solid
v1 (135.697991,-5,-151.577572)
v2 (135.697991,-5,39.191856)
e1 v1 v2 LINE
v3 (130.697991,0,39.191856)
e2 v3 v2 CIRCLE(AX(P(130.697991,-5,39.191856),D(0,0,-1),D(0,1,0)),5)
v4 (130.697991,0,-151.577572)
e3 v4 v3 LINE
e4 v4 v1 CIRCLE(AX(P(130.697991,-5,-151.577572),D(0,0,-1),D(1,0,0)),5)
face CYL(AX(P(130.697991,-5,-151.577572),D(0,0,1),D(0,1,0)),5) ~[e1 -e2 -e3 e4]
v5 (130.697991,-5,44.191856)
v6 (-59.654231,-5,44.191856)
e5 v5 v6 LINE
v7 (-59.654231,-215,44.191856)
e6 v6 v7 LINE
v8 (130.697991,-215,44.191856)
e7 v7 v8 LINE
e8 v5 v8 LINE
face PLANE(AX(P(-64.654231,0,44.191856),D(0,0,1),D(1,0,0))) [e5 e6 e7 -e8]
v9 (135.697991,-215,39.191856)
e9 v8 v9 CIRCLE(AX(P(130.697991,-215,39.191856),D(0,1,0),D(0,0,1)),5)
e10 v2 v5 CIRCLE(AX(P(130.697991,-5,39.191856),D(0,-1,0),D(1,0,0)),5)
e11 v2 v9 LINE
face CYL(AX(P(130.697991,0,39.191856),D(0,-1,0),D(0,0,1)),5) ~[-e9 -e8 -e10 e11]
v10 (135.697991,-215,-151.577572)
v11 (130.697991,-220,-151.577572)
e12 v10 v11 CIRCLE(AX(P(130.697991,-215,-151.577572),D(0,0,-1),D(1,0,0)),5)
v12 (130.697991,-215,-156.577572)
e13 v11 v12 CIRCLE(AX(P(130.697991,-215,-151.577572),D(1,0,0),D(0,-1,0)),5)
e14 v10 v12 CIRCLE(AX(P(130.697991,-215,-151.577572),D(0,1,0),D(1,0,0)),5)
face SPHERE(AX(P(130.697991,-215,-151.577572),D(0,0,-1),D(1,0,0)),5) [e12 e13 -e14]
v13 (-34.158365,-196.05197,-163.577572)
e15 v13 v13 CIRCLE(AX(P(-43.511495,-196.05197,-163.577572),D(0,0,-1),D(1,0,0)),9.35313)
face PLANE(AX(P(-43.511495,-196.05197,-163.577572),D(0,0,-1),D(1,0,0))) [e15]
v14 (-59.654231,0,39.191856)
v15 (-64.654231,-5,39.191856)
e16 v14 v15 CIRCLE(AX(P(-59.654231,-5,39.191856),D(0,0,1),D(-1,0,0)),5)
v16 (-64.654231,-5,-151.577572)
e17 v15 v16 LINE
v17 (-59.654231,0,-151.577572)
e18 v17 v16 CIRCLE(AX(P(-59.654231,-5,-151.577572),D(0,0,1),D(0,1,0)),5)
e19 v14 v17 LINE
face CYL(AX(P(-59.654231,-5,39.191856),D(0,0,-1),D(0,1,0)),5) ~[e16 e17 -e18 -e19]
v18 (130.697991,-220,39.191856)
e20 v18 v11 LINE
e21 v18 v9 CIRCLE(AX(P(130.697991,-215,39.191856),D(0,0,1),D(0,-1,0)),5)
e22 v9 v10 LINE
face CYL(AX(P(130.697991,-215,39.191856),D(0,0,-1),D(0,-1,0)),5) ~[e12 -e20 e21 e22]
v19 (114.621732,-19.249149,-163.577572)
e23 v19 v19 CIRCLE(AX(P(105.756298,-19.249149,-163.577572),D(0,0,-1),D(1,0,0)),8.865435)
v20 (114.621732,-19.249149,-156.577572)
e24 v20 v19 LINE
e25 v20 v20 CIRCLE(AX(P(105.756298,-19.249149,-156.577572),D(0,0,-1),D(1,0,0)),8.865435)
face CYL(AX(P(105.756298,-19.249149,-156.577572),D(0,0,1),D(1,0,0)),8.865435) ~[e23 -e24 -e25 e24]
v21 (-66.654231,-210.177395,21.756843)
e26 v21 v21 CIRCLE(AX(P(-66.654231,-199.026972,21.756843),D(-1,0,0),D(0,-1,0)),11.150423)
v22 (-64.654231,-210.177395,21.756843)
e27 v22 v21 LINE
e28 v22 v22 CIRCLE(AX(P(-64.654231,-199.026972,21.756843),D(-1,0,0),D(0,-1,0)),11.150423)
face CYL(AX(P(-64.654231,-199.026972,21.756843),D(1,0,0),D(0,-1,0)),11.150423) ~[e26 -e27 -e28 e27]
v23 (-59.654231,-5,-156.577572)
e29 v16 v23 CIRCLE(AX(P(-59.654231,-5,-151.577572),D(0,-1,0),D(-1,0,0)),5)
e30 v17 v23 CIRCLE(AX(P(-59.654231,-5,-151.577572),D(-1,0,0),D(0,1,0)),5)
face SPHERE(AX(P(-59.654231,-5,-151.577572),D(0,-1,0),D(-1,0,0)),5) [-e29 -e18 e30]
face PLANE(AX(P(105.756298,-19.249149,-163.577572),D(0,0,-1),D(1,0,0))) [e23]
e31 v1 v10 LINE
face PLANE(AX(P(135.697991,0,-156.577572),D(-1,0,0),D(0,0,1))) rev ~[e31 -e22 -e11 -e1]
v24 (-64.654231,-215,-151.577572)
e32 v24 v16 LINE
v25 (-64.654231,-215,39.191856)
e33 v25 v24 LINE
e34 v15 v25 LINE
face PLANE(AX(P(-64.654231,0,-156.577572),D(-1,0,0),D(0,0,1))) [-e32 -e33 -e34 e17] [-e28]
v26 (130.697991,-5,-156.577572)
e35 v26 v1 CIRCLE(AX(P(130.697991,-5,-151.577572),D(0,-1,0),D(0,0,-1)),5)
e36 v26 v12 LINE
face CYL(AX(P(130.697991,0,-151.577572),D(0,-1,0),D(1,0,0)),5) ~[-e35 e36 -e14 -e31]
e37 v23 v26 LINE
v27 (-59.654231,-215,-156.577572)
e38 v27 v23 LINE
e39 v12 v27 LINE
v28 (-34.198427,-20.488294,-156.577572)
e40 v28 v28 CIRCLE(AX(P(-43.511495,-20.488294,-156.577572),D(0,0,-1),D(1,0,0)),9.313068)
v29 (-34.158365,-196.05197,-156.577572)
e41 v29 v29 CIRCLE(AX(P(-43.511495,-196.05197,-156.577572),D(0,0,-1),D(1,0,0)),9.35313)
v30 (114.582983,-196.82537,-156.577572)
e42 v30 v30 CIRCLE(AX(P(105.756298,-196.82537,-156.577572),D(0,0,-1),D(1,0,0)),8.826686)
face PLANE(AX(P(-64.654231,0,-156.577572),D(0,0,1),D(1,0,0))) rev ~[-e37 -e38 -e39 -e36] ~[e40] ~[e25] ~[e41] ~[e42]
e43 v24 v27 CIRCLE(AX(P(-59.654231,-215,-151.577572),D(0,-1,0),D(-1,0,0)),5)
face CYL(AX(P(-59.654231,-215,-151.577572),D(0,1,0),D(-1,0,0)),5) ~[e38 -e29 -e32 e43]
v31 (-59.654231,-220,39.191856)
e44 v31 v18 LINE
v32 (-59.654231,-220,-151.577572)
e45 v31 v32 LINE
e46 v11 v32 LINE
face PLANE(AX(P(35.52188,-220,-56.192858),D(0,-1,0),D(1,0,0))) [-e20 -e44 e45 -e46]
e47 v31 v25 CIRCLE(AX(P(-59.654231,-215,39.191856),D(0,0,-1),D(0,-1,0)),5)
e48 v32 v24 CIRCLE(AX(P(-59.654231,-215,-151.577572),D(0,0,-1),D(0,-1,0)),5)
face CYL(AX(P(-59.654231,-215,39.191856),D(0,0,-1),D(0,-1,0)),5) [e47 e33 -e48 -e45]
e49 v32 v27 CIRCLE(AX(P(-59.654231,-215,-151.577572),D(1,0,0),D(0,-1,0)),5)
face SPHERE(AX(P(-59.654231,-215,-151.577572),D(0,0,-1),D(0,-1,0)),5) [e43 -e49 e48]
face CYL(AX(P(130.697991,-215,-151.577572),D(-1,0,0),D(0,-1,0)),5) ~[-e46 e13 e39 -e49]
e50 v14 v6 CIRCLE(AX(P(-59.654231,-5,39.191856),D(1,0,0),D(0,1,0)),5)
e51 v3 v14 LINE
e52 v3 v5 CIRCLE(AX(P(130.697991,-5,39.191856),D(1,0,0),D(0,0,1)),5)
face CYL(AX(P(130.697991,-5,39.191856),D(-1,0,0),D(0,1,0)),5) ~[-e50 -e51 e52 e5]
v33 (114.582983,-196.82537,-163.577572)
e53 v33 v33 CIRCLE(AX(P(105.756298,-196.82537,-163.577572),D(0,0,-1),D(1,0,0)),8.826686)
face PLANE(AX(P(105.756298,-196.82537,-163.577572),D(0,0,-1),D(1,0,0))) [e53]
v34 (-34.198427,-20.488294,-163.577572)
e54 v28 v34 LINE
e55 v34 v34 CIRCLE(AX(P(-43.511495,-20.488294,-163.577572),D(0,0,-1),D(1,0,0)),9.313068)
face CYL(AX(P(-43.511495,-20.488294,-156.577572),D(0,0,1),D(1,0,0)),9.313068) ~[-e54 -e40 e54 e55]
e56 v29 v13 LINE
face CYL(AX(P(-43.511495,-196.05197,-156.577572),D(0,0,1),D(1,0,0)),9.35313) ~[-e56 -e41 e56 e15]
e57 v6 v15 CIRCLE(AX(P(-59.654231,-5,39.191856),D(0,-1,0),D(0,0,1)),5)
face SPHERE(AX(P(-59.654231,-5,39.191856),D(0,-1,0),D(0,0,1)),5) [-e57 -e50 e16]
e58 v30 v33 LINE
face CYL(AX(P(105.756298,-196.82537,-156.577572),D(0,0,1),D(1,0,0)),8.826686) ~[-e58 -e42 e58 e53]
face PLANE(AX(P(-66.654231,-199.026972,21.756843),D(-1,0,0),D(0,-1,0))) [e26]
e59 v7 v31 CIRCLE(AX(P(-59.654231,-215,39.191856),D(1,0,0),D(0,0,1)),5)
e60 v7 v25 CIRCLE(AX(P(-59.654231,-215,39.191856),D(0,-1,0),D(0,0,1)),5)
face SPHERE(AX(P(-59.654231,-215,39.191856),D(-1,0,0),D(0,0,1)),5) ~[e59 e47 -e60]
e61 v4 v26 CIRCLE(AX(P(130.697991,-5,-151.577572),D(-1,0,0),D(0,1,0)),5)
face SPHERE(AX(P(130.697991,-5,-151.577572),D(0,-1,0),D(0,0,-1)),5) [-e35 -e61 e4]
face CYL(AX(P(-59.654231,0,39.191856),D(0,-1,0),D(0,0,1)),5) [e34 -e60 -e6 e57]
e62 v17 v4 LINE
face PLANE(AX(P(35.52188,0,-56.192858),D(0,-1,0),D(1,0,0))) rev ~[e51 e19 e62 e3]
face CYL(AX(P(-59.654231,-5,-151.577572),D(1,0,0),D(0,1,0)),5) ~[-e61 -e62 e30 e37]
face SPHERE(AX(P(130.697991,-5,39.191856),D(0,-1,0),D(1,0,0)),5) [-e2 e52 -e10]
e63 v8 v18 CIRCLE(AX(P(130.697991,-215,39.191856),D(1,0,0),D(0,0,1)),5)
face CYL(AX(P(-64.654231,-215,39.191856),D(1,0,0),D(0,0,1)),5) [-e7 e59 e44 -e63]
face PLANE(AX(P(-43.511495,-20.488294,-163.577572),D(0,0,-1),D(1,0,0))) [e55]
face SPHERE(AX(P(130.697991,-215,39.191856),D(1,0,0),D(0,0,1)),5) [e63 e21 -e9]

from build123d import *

# Parameters (mm, degrees)
F0_W      = 200.3522217274
F0_H      = 200.7694281638
F1_DEPTH  = 220
F2_W      = 106.5517105162
F2_H      = 12.7497781068
F3_DEPTH  = 15
F4_R      = 5
F5_R      = 5
F6_R      = 5
F8_R      = 5
F9_R      = 5
F12_DEPTH = 6.66
F14_R     = 8.8266857578
F14_R_2   = 8.8654347792
F14_R_3   = 9.3130675206
F14_R_4   = 9.3531300043
F15_DEPTH = 7
F7_R      = 11.1504231151
F18_DEPTH = 2


# Not quite as in the source:
# - the program builds the solid bodies; features that only make, move or delete a surface that nothing else refers to are left out


with BuildPart() as f1:
    # F0 (on Front) → F1 (new body)
    with BuildSketch(Plane.XZ):
        with Locations((35.5218797922, -56.1928581446)):
            Rectangle(F0_W, F0_H)
    extrude(amount=F1_DEPTH)

    # F2 (on face) → F3 (join)
    with BuildSketch(Plane.XZ.offset(220)):
        with Locations((33.8400062174, 20.9869192913)):
            Rectangle(F2_W, F2_H)
    extrude(amount=-F3_DEPTH)

    # F4
    f4_edges = [f1.edges().sort_by_distance(p)[0] for p in [
        (35.52188, -220, 44.191856),
    ]]
    fillet(f4_edges, radius=F4_R)

    # F5
    f5_edges = [f1.edges().sort_by_distance(p)[0] for p in [
        (135.697991, -218.535534, 42.72739),
    ]]
    fillet(f5_edges, radius=F5_R)

    # F6
    f6_edges = [f1.edges().sort_by_distance(p)[0] for p in [
        (-64.654231, -218.535534, 42.72739),
    ]]
    fillet(f6_edges, radius=F6_R)

    # F8
    f8_edges = [f1.edges().sort_by_distance(p)[0] for p in [
        (135.697991, -107.5, -156.577572),
        (35.52188, -220, -156.577572),
        (-64.654231, -107.5, -156.577572),
    ]]
    fillet(f8_edges, radius=F8_R)

    # F9
    f9_edges = [f1.edges().sort_by_distance(p)[0] for p in [
        (35.52188, 0, -156.577572),
    ]]
    fillet(f9_edges, radius=F9_R)

    # F2 (on face) → F12 (join)
    with BuildSketch(Plane.XZ.offset(220)):
        with Locations((33.8400062174, 20.9869192913)):
            Rectangle(F2_W, F2_H)
    extrude(amount=-F12_DEPTH)

    # F14 (on face) → F15 (join)
    with BuildSketch(Plane(origin=(0, 0, -156.5775722265), x_dir=(1, 0, 0), z_dir=(0, 0, -1))):
        with Locations((105.7562977076, 196.8253701925)):
            Circle(F14_R)
        with Locations((105.7562977076, 19.2491486669)):
            Circle(F14_R_2)
        with Locations((-43.5114949942, 20.4882938415)):
            Circle(F14_R_3)
        with Locations((-43.5114949942, 196.0519701242)):
            Circle(F14_R_4)
    extrude(amount=F15_DEPTH)

    # F7 (on face) → F18 (join)
    with BuildSketch(Plane(origin=(-64.6542310715, 0, 0), x_dir=(0, -1, 0), z_dir=(-1, 0, 0))):
        with Locations((199.0269720554, 21.7568427324)):
            Circle(F7_R)
    extrude(amount=F18_DEPTH)


solid = f1.part
